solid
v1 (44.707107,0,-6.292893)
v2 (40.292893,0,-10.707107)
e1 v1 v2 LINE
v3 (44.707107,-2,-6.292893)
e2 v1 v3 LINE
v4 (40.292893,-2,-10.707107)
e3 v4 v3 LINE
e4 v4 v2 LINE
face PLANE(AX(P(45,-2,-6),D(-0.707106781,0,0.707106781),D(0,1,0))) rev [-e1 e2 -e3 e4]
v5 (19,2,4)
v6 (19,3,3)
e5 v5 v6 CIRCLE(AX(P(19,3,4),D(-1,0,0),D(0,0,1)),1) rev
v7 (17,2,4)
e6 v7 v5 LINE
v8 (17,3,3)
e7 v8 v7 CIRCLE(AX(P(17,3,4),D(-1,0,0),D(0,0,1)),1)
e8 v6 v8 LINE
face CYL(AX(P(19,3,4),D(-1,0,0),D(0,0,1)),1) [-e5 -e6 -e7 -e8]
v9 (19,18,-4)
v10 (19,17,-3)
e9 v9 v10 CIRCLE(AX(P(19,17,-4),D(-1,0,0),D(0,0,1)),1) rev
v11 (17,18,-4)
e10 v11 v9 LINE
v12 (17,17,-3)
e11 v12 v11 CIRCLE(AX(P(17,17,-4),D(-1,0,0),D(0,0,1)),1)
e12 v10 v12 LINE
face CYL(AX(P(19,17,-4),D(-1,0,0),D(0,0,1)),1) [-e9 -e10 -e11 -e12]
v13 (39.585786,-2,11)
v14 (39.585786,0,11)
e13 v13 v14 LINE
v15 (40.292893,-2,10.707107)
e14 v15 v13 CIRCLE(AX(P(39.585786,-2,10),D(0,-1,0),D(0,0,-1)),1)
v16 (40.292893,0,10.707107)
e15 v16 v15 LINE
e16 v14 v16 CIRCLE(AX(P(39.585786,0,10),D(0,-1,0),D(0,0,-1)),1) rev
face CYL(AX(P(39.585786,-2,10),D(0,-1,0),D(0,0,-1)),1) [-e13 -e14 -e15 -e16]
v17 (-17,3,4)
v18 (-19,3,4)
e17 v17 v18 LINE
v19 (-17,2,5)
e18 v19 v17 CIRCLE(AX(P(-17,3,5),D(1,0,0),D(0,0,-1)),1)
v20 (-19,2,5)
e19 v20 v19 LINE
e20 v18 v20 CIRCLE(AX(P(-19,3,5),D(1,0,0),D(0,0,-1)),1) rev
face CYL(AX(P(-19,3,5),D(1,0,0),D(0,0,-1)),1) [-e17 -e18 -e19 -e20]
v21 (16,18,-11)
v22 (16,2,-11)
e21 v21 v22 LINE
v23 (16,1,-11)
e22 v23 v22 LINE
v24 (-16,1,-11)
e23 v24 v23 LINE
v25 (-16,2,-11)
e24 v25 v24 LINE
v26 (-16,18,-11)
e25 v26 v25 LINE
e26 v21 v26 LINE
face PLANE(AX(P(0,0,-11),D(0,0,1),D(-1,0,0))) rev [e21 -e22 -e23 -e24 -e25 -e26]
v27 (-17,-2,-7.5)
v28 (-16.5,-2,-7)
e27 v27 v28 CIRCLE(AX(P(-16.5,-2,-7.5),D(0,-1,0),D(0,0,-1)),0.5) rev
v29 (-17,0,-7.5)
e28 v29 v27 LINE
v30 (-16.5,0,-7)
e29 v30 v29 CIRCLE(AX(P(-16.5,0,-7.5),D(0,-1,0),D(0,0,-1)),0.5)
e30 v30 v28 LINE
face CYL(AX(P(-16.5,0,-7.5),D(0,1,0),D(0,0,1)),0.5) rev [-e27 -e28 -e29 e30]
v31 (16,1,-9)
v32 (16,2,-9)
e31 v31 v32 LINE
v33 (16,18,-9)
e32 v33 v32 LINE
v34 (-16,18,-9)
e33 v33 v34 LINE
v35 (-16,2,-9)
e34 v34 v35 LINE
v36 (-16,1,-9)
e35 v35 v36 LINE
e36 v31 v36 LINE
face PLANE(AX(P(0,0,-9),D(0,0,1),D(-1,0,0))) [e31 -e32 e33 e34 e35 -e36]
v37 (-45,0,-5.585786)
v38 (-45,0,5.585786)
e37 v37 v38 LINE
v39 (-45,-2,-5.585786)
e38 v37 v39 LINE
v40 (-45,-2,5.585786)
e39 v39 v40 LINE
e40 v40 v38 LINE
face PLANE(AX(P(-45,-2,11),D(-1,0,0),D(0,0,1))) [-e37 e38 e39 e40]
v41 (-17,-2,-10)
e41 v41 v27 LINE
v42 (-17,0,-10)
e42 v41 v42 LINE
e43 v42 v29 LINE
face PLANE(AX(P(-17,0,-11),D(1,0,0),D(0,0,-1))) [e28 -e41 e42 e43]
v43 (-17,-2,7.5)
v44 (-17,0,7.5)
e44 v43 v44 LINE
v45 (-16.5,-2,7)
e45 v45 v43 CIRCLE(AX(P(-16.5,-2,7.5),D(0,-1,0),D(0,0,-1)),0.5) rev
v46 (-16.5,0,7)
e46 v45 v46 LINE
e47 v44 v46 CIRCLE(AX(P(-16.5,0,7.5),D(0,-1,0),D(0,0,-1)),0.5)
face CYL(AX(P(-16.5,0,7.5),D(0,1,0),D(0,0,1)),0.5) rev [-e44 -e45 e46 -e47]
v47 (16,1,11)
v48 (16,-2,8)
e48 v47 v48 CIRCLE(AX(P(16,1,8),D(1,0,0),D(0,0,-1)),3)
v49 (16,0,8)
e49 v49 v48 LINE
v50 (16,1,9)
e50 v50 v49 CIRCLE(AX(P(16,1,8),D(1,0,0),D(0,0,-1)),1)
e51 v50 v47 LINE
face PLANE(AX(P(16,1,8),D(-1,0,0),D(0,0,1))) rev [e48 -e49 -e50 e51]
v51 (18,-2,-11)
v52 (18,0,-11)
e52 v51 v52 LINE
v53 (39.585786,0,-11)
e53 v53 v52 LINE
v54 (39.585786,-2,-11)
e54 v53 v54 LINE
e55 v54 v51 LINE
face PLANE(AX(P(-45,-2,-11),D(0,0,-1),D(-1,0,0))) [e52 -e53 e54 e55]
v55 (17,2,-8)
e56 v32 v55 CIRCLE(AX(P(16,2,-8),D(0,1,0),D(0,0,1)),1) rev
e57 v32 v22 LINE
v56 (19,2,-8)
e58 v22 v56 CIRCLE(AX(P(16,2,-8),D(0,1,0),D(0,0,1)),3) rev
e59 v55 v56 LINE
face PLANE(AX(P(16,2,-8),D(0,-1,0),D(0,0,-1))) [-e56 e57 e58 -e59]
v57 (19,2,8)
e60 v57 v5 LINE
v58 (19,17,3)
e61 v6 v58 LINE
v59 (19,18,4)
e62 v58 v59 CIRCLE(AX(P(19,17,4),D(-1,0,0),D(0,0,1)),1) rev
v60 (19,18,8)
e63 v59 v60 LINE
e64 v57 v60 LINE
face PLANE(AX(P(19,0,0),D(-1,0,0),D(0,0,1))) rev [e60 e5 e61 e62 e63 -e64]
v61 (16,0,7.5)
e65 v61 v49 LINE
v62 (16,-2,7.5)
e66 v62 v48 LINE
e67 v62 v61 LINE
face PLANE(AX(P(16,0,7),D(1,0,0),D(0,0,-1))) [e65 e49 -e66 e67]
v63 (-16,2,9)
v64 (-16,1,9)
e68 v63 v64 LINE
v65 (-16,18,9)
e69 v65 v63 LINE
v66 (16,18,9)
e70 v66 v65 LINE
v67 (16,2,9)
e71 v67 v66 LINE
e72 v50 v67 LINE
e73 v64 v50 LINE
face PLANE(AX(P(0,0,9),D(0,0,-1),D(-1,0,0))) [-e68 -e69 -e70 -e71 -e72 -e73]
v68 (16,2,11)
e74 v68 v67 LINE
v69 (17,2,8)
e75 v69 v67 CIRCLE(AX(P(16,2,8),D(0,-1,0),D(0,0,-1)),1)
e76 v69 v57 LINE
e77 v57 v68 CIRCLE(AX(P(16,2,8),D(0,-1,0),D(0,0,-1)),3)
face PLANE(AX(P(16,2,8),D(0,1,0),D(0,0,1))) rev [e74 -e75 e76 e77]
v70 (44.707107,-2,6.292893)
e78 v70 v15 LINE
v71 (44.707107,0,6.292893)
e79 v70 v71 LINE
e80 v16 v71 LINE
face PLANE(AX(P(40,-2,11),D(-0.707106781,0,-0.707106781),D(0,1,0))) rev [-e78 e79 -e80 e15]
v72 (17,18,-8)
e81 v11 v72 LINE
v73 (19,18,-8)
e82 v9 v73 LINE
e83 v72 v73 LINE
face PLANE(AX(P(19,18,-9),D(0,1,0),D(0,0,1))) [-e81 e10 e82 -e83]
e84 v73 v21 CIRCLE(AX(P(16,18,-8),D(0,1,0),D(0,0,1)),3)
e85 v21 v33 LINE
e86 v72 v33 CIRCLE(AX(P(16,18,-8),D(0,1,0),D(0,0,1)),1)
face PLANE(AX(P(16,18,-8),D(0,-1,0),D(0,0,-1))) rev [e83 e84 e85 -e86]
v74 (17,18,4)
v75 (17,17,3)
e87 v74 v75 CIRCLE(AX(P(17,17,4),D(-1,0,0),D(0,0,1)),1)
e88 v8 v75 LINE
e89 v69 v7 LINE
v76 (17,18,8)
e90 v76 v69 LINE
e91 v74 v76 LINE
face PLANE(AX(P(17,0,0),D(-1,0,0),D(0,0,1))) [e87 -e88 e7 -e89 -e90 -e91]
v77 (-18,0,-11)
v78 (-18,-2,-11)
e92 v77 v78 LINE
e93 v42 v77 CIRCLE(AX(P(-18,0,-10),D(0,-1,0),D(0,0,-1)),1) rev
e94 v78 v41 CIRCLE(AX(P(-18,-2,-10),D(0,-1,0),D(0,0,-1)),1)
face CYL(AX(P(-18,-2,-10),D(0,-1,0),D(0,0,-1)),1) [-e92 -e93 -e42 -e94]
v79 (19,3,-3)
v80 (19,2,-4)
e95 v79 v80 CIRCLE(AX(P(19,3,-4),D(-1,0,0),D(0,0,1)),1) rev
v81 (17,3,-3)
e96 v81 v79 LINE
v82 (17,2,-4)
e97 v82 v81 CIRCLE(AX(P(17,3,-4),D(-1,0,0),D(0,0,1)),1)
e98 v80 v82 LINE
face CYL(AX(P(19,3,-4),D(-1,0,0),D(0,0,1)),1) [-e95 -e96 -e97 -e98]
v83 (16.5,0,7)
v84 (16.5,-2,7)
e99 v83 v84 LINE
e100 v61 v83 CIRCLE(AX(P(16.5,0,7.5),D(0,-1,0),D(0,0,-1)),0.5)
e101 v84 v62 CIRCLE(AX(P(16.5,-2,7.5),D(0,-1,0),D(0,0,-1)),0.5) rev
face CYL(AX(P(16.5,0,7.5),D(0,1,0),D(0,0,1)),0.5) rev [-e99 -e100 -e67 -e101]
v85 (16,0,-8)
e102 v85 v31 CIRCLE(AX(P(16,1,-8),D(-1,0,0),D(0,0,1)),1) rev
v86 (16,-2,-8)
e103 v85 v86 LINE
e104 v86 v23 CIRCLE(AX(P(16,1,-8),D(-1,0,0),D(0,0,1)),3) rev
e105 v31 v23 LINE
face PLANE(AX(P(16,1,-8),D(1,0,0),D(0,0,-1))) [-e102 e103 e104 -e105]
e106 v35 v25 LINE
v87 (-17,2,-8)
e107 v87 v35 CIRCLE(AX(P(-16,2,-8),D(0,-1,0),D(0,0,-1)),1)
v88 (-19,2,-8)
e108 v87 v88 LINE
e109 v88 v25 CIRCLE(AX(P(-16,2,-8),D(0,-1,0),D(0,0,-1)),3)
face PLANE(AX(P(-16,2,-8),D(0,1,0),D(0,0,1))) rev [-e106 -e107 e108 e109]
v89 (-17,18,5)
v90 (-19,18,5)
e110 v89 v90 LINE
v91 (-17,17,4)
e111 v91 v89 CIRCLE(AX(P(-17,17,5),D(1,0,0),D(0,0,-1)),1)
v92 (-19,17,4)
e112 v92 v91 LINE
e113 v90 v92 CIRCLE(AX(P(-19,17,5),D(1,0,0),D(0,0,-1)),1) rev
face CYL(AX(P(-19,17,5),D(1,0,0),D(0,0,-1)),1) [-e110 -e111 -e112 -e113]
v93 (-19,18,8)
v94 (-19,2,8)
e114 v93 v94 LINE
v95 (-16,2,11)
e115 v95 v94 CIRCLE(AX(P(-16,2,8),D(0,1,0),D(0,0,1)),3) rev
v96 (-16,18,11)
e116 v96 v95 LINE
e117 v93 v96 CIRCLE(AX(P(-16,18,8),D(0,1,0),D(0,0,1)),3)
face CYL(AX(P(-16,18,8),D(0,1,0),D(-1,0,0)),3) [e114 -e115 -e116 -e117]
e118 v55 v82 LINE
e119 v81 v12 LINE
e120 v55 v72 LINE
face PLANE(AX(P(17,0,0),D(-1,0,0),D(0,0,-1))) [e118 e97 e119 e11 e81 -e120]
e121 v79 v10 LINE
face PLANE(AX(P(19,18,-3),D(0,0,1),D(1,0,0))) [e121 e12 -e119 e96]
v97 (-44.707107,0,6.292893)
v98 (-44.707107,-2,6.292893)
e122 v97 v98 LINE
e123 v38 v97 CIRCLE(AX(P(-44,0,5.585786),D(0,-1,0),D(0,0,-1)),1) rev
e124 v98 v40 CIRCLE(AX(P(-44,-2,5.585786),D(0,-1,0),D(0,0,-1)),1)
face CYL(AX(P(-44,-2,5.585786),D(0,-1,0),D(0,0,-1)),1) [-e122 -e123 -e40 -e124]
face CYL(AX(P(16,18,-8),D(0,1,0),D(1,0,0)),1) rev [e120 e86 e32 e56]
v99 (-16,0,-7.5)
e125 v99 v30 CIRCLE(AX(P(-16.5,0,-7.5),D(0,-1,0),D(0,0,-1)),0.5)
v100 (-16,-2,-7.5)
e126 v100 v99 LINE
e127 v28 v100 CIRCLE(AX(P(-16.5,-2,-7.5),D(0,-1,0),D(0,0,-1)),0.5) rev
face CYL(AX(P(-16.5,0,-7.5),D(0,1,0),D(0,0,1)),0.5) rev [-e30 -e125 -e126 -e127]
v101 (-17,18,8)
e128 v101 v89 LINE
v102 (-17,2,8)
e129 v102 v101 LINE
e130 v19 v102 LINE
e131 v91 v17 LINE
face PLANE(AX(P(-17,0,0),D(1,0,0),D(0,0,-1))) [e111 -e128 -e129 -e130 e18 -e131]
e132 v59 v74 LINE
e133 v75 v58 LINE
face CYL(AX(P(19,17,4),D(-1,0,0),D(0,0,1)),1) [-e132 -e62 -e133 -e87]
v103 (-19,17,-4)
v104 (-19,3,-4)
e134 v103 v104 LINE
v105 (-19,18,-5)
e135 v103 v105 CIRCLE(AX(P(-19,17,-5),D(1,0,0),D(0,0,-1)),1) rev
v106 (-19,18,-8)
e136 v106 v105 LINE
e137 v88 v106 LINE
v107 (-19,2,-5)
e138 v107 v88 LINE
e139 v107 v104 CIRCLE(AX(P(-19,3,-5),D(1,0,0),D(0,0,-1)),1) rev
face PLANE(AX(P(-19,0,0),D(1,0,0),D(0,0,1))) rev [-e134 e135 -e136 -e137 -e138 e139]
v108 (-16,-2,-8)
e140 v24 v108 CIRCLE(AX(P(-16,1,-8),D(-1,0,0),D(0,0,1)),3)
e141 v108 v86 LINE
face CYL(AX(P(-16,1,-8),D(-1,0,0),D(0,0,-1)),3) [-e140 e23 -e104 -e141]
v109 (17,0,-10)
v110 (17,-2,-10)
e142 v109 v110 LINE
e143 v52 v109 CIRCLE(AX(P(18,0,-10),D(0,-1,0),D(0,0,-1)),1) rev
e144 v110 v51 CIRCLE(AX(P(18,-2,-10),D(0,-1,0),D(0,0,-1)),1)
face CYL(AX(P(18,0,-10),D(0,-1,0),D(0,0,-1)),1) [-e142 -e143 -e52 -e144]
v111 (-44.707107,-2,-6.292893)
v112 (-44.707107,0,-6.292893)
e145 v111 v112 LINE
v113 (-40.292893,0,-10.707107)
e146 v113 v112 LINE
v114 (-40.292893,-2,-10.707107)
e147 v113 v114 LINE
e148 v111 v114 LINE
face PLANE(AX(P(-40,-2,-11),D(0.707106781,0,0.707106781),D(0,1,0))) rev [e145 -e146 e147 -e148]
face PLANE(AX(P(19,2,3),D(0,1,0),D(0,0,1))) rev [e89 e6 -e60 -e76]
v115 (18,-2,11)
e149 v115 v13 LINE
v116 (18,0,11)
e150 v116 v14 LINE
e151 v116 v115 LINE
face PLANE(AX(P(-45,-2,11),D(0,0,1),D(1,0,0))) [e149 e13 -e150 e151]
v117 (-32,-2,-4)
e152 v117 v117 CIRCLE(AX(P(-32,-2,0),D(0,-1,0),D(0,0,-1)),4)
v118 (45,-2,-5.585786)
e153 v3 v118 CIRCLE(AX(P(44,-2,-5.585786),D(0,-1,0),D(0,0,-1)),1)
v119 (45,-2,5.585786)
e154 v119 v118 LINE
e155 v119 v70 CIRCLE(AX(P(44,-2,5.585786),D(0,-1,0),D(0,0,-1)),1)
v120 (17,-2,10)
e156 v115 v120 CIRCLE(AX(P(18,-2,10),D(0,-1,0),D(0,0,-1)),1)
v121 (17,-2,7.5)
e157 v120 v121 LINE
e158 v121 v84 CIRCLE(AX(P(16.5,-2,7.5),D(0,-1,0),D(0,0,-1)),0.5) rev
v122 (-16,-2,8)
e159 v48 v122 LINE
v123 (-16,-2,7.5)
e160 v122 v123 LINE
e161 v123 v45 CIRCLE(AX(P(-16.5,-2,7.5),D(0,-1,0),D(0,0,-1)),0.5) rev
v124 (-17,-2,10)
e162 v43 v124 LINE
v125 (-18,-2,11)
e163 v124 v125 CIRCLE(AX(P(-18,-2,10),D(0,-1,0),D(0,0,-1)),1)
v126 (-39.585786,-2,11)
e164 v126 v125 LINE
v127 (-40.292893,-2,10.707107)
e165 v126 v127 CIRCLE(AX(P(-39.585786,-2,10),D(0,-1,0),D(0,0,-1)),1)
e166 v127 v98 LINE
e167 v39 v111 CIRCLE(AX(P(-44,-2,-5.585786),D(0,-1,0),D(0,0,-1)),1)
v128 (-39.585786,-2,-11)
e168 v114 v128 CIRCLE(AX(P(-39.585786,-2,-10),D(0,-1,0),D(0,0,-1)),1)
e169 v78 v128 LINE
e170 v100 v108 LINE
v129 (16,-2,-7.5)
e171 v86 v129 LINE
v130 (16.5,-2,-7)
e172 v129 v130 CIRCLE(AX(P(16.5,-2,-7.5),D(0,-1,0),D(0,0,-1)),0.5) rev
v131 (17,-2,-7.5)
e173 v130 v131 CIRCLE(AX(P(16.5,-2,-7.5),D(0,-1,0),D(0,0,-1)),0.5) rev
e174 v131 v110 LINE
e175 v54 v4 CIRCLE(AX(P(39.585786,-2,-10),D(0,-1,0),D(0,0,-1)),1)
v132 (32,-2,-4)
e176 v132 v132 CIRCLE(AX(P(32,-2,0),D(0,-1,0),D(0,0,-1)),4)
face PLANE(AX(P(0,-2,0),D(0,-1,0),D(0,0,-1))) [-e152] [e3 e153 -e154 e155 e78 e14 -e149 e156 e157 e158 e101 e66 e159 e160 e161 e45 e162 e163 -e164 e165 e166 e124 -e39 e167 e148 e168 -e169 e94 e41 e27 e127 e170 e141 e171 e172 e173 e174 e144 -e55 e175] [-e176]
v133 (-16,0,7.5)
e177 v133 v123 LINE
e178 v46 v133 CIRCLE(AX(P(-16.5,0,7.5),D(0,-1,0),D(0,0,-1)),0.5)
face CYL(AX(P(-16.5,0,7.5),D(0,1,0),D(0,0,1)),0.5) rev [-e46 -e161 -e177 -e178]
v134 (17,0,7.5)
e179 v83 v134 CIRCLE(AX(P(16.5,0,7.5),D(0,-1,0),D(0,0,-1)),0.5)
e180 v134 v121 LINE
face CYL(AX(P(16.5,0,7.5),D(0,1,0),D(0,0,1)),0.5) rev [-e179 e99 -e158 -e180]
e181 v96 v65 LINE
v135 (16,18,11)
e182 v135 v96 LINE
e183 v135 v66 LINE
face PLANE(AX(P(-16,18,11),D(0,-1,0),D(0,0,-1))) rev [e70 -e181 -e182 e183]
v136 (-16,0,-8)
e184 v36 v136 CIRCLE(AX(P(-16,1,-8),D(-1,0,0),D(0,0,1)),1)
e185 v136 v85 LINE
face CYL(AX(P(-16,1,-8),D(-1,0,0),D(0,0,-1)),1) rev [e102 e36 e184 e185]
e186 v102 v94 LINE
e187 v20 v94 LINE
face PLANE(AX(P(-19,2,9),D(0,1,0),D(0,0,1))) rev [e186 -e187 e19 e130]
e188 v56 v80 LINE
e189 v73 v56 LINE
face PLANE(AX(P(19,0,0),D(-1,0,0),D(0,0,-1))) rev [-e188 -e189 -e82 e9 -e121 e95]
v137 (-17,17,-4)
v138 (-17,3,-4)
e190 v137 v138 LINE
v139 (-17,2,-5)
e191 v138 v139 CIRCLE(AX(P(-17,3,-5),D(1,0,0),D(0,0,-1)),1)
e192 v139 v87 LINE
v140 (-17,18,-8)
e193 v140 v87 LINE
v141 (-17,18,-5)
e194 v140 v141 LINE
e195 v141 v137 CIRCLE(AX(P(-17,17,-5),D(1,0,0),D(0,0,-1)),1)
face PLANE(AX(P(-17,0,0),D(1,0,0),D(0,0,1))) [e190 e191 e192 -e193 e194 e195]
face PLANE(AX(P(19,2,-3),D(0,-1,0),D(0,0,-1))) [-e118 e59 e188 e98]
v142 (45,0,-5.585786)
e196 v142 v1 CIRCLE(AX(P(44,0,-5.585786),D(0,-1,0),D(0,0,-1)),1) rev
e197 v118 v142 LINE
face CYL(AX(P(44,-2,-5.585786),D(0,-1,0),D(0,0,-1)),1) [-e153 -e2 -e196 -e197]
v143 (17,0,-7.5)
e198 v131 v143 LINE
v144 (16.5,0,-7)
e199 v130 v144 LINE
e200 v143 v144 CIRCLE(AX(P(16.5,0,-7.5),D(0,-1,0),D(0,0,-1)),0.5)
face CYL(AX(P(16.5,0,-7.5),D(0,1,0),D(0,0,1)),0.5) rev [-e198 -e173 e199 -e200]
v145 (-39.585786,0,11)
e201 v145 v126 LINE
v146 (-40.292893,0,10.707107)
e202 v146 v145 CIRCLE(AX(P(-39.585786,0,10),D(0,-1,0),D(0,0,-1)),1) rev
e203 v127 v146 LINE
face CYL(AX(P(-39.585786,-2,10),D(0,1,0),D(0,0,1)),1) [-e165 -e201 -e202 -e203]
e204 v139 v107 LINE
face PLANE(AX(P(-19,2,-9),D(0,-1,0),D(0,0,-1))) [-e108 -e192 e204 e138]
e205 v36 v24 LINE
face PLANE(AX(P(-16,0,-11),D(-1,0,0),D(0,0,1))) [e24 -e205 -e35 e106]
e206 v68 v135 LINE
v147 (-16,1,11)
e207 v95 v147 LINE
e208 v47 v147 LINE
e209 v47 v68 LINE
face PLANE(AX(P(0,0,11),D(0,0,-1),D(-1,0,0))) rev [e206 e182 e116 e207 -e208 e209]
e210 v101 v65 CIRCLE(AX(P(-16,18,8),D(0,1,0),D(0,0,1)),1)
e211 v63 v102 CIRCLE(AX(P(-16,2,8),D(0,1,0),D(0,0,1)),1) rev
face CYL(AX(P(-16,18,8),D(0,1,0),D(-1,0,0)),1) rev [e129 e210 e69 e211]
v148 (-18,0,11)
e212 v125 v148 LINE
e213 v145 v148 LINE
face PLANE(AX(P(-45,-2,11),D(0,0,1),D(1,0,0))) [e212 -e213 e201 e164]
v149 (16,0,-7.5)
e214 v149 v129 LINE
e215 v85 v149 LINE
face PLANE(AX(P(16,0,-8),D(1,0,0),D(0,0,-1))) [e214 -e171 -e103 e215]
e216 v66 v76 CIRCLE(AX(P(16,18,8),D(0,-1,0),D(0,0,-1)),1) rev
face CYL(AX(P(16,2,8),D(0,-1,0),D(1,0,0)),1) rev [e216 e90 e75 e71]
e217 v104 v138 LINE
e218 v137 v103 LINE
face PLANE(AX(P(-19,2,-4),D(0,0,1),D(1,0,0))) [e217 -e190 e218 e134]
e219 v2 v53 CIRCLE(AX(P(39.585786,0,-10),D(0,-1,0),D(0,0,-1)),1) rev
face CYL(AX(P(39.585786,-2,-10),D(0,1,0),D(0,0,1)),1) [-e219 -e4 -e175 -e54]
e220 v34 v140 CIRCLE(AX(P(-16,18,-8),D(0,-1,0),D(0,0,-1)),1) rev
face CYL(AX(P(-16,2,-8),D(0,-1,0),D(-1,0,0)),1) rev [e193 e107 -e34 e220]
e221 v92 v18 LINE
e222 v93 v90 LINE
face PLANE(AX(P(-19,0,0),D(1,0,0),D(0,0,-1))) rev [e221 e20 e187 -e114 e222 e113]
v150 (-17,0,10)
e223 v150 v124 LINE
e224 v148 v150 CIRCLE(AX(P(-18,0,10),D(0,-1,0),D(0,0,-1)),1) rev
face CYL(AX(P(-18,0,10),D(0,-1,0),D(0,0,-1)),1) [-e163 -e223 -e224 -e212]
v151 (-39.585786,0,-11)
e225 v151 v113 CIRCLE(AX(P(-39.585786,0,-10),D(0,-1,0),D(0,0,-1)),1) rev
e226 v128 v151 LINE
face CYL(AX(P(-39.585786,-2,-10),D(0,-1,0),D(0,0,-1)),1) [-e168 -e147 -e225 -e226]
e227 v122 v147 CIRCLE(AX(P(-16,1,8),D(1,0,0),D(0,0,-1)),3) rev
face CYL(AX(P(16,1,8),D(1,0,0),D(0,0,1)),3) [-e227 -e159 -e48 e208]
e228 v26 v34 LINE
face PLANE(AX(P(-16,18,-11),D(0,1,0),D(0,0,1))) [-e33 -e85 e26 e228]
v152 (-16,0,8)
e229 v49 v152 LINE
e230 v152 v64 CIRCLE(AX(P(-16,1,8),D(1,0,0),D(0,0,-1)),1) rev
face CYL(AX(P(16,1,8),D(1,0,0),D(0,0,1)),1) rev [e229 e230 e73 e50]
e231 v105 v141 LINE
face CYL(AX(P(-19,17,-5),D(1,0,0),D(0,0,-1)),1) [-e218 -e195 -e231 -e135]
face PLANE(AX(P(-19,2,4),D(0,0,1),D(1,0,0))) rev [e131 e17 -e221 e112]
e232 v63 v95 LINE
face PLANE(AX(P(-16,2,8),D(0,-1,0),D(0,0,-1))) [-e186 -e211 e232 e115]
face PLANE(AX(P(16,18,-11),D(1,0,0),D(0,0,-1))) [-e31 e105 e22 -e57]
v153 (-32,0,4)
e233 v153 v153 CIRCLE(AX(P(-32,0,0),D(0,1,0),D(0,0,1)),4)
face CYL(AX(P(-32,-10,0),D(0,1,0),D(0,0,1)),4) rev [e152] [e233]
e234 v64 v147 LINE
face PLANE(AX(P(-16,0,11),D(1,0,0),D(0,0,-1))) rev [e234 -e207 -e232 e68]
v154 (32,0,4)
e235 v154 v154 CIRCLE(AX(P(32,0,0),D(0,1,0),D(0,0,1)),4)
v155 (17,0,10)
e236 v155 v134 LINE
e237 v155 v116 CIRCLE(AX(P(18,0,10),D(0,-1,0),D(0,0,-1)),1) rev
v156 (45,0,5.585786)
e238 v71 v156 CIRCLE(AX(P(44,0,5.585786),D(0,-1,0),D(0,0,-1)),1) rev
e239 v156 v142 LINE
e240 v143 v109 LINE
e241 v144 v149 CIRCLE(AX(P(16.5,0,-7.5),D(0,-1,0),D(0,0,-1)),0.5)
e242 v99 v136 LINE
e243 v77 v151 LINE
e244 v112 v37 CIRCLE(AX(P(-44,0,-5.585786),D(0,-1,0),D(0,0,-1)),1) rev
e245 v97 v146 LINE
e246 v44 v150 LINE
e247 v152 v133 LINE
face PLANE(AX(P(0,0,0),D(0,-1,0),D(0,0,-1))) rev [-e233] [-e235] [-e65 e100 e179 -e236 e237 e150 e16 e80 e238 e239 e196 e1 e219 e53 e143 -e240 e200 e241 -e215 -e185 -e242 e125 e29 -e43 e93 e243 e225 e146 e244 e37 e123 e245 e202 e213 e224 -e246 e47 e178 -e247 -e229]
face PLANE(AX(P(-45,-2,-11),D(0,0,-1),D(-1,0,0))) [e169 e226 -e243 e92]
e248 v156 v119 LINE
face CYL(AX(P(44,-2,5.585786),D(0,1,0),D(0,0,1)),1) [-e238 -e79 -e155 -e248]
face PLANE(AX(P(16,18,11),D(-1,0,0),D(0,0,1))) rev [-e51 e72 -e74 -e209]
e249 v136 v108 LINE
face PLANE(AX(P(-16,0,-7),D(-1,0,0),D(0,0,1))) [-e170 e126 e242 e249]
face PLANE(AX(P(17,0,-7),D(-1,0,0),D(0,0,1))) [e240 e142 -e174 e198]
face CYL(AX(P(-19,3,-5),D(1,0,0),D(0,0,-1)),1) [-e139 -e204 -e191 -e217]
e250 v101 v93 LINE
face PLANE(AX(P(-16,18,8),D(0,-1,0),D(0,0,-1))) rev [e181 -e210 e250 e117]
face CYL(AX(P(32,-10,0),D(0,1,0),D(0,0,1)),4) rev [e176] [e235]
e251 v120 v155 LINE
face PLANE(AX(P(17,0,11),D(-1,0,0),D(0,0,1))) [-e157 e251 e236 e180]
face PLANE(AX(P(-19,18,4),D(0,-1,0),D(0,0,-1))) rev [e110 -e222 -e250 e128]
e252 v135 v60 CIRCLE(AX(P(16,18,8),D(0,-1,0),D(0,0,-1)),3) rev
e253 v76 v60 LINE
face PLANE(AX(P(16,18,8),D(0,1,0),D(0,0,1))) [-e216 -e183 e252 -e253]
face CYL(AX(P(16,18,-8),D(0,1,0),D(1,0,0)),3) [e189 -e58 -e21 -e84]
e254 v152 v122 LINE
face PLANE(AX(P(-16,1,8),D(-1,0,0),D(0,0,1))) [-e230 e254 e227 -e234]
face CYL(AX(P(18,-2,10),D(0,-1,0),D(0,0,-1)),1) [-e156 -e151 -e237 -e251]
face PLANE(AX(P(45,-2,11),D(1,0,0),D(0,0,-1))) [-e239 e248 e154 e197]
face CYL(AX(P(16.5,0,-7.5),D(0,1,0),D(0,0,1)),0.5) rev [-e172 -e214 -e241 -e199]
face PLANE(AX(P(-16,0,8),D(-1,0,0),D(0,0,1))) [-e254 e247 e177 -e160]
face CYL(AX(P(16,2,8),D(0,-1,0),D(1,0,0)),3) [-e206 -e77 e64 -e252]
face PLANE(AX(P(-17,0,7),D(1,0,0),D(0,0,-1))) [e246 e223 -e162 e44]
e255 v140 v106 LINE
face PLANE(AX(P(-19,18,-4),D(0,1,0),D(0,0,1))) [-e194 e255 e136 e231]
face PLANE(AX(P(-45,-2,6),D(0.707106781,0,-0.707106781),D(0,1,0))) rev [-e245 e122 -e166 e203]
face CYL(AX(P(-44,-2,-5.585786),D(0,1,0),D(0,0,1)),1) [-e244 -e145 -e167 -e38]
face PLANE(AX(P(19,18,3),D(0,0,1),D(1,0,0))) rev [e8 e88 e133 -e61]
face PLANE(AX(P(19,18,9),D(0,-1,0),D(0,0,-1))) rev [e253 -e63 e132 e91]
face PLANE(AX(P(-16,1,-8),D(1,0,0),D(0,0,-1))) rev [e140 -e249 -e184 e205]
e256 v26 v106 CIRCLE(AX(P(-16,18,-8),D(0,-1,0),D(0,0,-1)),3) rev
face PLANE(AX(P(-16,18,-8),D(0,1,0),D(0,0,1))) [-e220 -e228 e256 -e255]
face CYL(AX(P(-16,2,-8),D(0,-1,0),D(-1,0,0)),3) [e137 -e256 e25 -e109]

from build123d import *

# Parameters (mm, degrees)
SKETCH1_W                     = 90
SKETCH1_H                     = 22
BASE_FLANGE1_DEPTH            = 2
EDGE_FLANGE4_STRIP_W          = 10
EDGE_FLANGE4_STRIP_H          = 2
EDGE_FLANGE4_STRIP_CUT_DEPTH  = 32
EDGE_FLANGE4_RELIEF_W         = 11
EDGE_FLANGE4_RELIEF_H         = 1
EDGE_FLANGE4_RELIEF_CUT_DEPTH = 2
EDGE_FLANGE4_DEPTH            = 32
EDGE_FLANGE8_DEPTH            = 16
EDGE_FLANGE9_DEPTH            = 16
FILLET2_R                     = 1
FILLET4_R                     = 1
FILLET5_R                     = 1
FILLET7_R                     = 0.5
FILLET8_R                     = 0.5
FILLET9_R                     = 0.5
FILLET10_R                    = 1
BREAK_CORNER2_START           = -39.597979746
BREAK_CORNER2_OUTLINE_W       = 72.124891682
BREAK_CORNER2_OUTLINE_H       = 4
BREAK_CORNER2_DEPTH           = 3.535533905
BREAK_CORNER2_START_2         = 36.062445841
BREAK_CORNER2_2_OUTLINE_W     = 72.124891682
BREAK_CORNER2_2_OUTLINE_H     = 4
BREAK_CORNER2_2_DEPTH         = 3.535533905
BREAK_CORNER2_START_3         = -27.577164466
BREAK_CORNER2_3_OUTLINE_W     = 3.937554159
BREAK_CORNER2_3_OUTLINE_H     = 4
BREAK_CORNER2_3_DEPTH         = 55.154328932
FILLET11_R                    = 1
FILLET12_R                    = 0.5
FILLET13_R                    = 1
SKETCH62_R                    = 4
CUT_EXTRUDE2_DEPTH            = 10
SKETCH63_R                    = 4
CUT_EXTRUDE3_DEPTH            = 10


# Read off the part's stored shape, not the designer's step: Break-Corner2
# Sheet-metal steps are written as plain solids
with BuildPart() as part:
    # Sketch1 → Base-Flange1 (new body)
    with BuildSketch(Plane(origin=(0, 0, 0), x_dir=(1, 0, 0), z_dir=(0, 1, 0))):
        Rectangle(SKETCH1_W, SKETCH1_H)
    extrude(amount=-BASE_FLANGE1_DEPTH)

    # Edge-Flange4 strip (across the edge) → Edge-Flange4 strip cut (cut)
    with BuildSketch(Plane(origin=(-16, 0, 11), x_dir=(0, 0, -1), z_dir=(1, 0, 0))):
        with Locations((-2, -1)):
            Rectangle(EDGE_FLANGE4_STRIP_W, EDGE_FLANGE4_STRIP_H)
    edge_flange4_strip_cut = extrude(amount=EDGE_FLANGE4_STRIP_CUT_DEPTH, mode=Mode.SUBTRACT)

    # Edge-Flange4 relief (on the sheet) → Edge-Flange4 relief cut (cut)
    with BuildSketch(Plane(origin=(-16, 0, 8), x_dir=(0, 0, -1), z_dir=(0, 1, 0))):
        with Locations((-4.5, 0.5)):
            Rectangle(EDGE_FLANGE4_RELIEF_W, EDGE_FLANGE4_RELIEF_H)
        with Locations((-4.5, -32.5)):
            Rectangle(EDGE_FLANGE4_RELIEF_W, EDGE_FLANGE4_RELIEF_H)
    edge_flange4_relief_cut = extrude(amount=-EDGE_FLANGE4_RELIEF_CUT_DEPTH, mode=Mode.SUBTRACT)

    # Edge-Flange4 section (across the edge) → Edge-Flange4 (add)
    with BuildSketch(Plane(origin=(-16, 0, 11), x_dir=(0, 0, -1), z_dir=(1, 0, 0))):
        with BuildLine():
            Line((0, 1), (0, 18))
            Line((0, 18), (2, 18))
            Line((2, 18), (2, 1))
            ThreePointArc((2, 1), (2.292893219, 0.292893219), (3, 0))
            Line((3, 0), (3, -2))
            ThreePointArc((3, -2), (0.878679656, -1.121320344), (0, 1))
        make_face()
    edge_flange4 = extrude(amount=EDGE_FLANGE4_DEPTH)

    # Edge-Flange8 section (across the edge) → Edge-Flange8 (add)
    with BuildSketch(Plane(origin=(17, 18, 9), x_dir=(-1, 0, 0), z_dir=(0, -1, 0))):
        with BuildLine():
            Line((-2, 1), (-2, 6))
            Line((-2, 6), (0, 6))
            Line((0, 6), (0, 1))
            ThreePointArc((0, 1), (0.292893219, 0.292893219), (1, 0))
            Line((1, 0), (1, -2))
            ThreePointArc((1, -2), (-1.121320344, -1.121320344), (-2, 1))
        make_face()
    edge_flange8 = extrude(amount=EDGE_FLANGE8_DEPTH)

    # Edge-Flange9 section (across the edge) → Edge-Flange9 (add)
    with BuildSketch(Plane(origin=(-17, 2, 9), x_dir=(1, 0, 0), z_dir=(0, 1, 0))):
        with BuildLine():
            Line((-2, 1), (-2, 5))
            Line((-2, 5), (0, 5))
            Line((0, 5), (0, 1))
            ThreePointArc((0, 1), (0.292893219, 0.292893219), (1, 0))
            Line((1, 0), (1, -2))
            ThreePointArc((1, -2), (-1.121320344, -1.121320344), (-2, 1))
        make_face()
    edge_flange9 = extrude(amount=EDGE_FLANGE9_DEPTH)

    # Fillet2
    fillet2_edges = [part.edges().sort_by_distance(p)[0] for p in [
        (18, 2, 3),
    ]]
    fillet(fillet2_edges, radius=FILLET2_R)

    # Fillet4
    fillet4_edges = [part.edges().sort_by_distance(p)[0] for p in [
        (-18, 18, 4),
        (18, 18, 3),
    ]]
    fillet(fillet4_edges, radius=FILLET4_R)

    # Fillet5
    fillet5_edges = [part.edges().sort_by_distance(p)[0] for p in [
        (-18, 2, 4),
    ]]
    fillet(fillet5_edges, radius=FILLET5_R)

    # Fillet7
    fillet7_edges = [part.edges().sort_by_distance(p)[0] for p in [
        (16, -1, 7),
    ]]
    fillet(fillet7_edges, radius=FILLET7_R)

    # Fillet8
    fillet8_edges = [part.edges().sort_by_distance(p)[0] for p in [
        (17, -1, 7),
    ]]
    fillet(fillet8_edges, radius=FILLET8_R - 0.0001)  # a hair under: the kernel refuses the full size

    # Fillet9
    fillet9_edges = [part.edges().sort_by_distance(p)[0] for p in [
        (-16, -1, 7),
        (-17, -1, 7),
    ]]
    fillet(fillet9_edges, radius=FILLET9_R - 0.0001)  # a hair under: the kernel refuses the full size

    # Fillet10
    fillet10_edges = [part.edges().sort_by_distance(p)[0] for p in [
        (17, -1, 11),
        (-17, -1, 11),
    ]]
    fillet(fillet10_edges, radius=FILLET10_R)

    # Break-Corner2 outline → Break-Corner2 (cut)
    with BuildSketch(Plane(origin=(0, 0, 0), x_dir=(0.7071067811865471, 0, -0.707106781186548), z_dir=(0.707106781186548, 0, 0.707106781186547)).offset(BREAK_CORNER2_START)):
        with Locations((0, -1)):
            Rectangle(BREAK_CORNER2_OUTLINE_W, BREAK_CORNER2_OUTLINE_H)
    extrude(amount=BREAK_CORNER2_DEPTH, mode=Mode.SUBTRACT)

    # Break-Corner2 2 outline → Break-Corner2 2 (cut)
    with BuildSketch(Plane(origin=(0, 0, 0), x_dir=(0.7071067811865471, 0, -0.707106781186548), z_dir=(0.707106781186548, 0, 0.707106781186547)).offset(BREAK_CORNER2_START_2)):
        with Locations((0, -1)):
            Rectangle(BREAK_CORNER2_2_OUTLINE_W, BREAK_CORNER2_2_OUTLINE_H)
    extrude(amount=BREAK_CORNER2_2_DEPTH, mode=Mode.SUBTRACT)

    # Break-Corner2 3 outline → Break-Corner2 3 (cut)
    with BuildSketch(Plane(origin=(0, 0, 0), x_dir=(0.7071067811865471, 0, -0.707106781186548), z_dir=(0.707106781186548, 0, 0.707106781186547)).offset(BREAK_CORNER2_START_3)):
        with Locations((38.03122292, -1)):
            Rectangle(BREAK_CORNER2_3_OUTLINE_W, BREAK_CORNER2_3_OUTLINE_H)
        with Locations((-38.03122292, -1)):
            Rectangle(BREAK_CORNER2_3_OUTLINE_W, BREAK_CORNER2_3_OUTLINE_H)
    extrude(amount=BREAK_CORNER2_3_DEPTH, mode=Mode.SUBTRACT)

    # Mirror1: Edge-Flange4 strip cut, Edge-Flange4 relief cut, Edge-Flange4, Edge-Flange8, Edge-Flange9 across plane
    add(edge_flange4_strip_cut.mirror(Plane.XY), mode=Mode.SUBTRACT)
    add(edge_flange4_relief_cut.mirror(Plane.XY), mode=Mode.SUBTRACT)
    add(edge_flange4.mirror(Plane.XY))
    add(edge_flange8.mirror(Plane.XY))
    add(edge_flange9.mirror(Plane.XY))

    # Fillet11
    fillet11_edges = [part.edges().sort_by_distance(p)[0] for p in [
        (17, -1, -11),
        (-17, -1, -11),
        (-18, 2, -4),
        (-18, 18, -4),
        (18, 2, -3),
        (18, 18, -3),
    ]]
    fillet(fillet11_edges, radius=FILLET11_R)

    # Fillet12
    fillet12_edges = [part.edges().sort_by_distance(p)[0] for p in [
        (-17, -1, -7),
        (-16, -1, -7),
        (16, -1, -7),
        (17, -1, -7),
    ]]
    fillet(fillet12_edges, radius=FILLET12_R - 0.0001)  # a hair under: the kernel refuses the full size

    # Fillet13
    fillet13_edges = [part.edges().sort_by_distance(p)[0] for p in [
        (40.000000001, -1, 11),
        (45, -1, 6.000000001),
        (45, -1, -6.000000001),
        (40.000000001, -1, -11),
        (-40.000000001, -1, -11),
        (-45, -1, -6.000000001),
        (-45, -1, 6.000000001),
        (-40.000000001, -1, 11),
    ]]
    fillet(fillet13_edges, radius=FILLET13_R)

    # Sketch62 → Cut-Extrude2 (cut)
    with BuildSketch(Plane(origin=(0, 0, 0), x_dir=(1, 0, 0), z_dir=(0, 1, 0))):
        with Locations(Location((-32, 0, 0), (0, 0, 270))):
            Circle(SKETCH62_R)
    extrude(amount=-CUT_EXTRUDE2_DEPTH, mode=Mode.SUBTRACT)

    # Sketch63 → Cut-Extrude3 (cut)
    with BuildSketch(Plane(origin=(0, 0, 0), x_dir=(1, 0, 0), z_dir=(0, 1, 0))):
        with Locations(Location((32, 0, 0), (0, 0, 270))):
            Circle(SKETCH63_R)
    extrude(amount=-CUT_EXTRUDE3_DEPTH, mode=Mode.SUBTRACT)


solid = part.part
